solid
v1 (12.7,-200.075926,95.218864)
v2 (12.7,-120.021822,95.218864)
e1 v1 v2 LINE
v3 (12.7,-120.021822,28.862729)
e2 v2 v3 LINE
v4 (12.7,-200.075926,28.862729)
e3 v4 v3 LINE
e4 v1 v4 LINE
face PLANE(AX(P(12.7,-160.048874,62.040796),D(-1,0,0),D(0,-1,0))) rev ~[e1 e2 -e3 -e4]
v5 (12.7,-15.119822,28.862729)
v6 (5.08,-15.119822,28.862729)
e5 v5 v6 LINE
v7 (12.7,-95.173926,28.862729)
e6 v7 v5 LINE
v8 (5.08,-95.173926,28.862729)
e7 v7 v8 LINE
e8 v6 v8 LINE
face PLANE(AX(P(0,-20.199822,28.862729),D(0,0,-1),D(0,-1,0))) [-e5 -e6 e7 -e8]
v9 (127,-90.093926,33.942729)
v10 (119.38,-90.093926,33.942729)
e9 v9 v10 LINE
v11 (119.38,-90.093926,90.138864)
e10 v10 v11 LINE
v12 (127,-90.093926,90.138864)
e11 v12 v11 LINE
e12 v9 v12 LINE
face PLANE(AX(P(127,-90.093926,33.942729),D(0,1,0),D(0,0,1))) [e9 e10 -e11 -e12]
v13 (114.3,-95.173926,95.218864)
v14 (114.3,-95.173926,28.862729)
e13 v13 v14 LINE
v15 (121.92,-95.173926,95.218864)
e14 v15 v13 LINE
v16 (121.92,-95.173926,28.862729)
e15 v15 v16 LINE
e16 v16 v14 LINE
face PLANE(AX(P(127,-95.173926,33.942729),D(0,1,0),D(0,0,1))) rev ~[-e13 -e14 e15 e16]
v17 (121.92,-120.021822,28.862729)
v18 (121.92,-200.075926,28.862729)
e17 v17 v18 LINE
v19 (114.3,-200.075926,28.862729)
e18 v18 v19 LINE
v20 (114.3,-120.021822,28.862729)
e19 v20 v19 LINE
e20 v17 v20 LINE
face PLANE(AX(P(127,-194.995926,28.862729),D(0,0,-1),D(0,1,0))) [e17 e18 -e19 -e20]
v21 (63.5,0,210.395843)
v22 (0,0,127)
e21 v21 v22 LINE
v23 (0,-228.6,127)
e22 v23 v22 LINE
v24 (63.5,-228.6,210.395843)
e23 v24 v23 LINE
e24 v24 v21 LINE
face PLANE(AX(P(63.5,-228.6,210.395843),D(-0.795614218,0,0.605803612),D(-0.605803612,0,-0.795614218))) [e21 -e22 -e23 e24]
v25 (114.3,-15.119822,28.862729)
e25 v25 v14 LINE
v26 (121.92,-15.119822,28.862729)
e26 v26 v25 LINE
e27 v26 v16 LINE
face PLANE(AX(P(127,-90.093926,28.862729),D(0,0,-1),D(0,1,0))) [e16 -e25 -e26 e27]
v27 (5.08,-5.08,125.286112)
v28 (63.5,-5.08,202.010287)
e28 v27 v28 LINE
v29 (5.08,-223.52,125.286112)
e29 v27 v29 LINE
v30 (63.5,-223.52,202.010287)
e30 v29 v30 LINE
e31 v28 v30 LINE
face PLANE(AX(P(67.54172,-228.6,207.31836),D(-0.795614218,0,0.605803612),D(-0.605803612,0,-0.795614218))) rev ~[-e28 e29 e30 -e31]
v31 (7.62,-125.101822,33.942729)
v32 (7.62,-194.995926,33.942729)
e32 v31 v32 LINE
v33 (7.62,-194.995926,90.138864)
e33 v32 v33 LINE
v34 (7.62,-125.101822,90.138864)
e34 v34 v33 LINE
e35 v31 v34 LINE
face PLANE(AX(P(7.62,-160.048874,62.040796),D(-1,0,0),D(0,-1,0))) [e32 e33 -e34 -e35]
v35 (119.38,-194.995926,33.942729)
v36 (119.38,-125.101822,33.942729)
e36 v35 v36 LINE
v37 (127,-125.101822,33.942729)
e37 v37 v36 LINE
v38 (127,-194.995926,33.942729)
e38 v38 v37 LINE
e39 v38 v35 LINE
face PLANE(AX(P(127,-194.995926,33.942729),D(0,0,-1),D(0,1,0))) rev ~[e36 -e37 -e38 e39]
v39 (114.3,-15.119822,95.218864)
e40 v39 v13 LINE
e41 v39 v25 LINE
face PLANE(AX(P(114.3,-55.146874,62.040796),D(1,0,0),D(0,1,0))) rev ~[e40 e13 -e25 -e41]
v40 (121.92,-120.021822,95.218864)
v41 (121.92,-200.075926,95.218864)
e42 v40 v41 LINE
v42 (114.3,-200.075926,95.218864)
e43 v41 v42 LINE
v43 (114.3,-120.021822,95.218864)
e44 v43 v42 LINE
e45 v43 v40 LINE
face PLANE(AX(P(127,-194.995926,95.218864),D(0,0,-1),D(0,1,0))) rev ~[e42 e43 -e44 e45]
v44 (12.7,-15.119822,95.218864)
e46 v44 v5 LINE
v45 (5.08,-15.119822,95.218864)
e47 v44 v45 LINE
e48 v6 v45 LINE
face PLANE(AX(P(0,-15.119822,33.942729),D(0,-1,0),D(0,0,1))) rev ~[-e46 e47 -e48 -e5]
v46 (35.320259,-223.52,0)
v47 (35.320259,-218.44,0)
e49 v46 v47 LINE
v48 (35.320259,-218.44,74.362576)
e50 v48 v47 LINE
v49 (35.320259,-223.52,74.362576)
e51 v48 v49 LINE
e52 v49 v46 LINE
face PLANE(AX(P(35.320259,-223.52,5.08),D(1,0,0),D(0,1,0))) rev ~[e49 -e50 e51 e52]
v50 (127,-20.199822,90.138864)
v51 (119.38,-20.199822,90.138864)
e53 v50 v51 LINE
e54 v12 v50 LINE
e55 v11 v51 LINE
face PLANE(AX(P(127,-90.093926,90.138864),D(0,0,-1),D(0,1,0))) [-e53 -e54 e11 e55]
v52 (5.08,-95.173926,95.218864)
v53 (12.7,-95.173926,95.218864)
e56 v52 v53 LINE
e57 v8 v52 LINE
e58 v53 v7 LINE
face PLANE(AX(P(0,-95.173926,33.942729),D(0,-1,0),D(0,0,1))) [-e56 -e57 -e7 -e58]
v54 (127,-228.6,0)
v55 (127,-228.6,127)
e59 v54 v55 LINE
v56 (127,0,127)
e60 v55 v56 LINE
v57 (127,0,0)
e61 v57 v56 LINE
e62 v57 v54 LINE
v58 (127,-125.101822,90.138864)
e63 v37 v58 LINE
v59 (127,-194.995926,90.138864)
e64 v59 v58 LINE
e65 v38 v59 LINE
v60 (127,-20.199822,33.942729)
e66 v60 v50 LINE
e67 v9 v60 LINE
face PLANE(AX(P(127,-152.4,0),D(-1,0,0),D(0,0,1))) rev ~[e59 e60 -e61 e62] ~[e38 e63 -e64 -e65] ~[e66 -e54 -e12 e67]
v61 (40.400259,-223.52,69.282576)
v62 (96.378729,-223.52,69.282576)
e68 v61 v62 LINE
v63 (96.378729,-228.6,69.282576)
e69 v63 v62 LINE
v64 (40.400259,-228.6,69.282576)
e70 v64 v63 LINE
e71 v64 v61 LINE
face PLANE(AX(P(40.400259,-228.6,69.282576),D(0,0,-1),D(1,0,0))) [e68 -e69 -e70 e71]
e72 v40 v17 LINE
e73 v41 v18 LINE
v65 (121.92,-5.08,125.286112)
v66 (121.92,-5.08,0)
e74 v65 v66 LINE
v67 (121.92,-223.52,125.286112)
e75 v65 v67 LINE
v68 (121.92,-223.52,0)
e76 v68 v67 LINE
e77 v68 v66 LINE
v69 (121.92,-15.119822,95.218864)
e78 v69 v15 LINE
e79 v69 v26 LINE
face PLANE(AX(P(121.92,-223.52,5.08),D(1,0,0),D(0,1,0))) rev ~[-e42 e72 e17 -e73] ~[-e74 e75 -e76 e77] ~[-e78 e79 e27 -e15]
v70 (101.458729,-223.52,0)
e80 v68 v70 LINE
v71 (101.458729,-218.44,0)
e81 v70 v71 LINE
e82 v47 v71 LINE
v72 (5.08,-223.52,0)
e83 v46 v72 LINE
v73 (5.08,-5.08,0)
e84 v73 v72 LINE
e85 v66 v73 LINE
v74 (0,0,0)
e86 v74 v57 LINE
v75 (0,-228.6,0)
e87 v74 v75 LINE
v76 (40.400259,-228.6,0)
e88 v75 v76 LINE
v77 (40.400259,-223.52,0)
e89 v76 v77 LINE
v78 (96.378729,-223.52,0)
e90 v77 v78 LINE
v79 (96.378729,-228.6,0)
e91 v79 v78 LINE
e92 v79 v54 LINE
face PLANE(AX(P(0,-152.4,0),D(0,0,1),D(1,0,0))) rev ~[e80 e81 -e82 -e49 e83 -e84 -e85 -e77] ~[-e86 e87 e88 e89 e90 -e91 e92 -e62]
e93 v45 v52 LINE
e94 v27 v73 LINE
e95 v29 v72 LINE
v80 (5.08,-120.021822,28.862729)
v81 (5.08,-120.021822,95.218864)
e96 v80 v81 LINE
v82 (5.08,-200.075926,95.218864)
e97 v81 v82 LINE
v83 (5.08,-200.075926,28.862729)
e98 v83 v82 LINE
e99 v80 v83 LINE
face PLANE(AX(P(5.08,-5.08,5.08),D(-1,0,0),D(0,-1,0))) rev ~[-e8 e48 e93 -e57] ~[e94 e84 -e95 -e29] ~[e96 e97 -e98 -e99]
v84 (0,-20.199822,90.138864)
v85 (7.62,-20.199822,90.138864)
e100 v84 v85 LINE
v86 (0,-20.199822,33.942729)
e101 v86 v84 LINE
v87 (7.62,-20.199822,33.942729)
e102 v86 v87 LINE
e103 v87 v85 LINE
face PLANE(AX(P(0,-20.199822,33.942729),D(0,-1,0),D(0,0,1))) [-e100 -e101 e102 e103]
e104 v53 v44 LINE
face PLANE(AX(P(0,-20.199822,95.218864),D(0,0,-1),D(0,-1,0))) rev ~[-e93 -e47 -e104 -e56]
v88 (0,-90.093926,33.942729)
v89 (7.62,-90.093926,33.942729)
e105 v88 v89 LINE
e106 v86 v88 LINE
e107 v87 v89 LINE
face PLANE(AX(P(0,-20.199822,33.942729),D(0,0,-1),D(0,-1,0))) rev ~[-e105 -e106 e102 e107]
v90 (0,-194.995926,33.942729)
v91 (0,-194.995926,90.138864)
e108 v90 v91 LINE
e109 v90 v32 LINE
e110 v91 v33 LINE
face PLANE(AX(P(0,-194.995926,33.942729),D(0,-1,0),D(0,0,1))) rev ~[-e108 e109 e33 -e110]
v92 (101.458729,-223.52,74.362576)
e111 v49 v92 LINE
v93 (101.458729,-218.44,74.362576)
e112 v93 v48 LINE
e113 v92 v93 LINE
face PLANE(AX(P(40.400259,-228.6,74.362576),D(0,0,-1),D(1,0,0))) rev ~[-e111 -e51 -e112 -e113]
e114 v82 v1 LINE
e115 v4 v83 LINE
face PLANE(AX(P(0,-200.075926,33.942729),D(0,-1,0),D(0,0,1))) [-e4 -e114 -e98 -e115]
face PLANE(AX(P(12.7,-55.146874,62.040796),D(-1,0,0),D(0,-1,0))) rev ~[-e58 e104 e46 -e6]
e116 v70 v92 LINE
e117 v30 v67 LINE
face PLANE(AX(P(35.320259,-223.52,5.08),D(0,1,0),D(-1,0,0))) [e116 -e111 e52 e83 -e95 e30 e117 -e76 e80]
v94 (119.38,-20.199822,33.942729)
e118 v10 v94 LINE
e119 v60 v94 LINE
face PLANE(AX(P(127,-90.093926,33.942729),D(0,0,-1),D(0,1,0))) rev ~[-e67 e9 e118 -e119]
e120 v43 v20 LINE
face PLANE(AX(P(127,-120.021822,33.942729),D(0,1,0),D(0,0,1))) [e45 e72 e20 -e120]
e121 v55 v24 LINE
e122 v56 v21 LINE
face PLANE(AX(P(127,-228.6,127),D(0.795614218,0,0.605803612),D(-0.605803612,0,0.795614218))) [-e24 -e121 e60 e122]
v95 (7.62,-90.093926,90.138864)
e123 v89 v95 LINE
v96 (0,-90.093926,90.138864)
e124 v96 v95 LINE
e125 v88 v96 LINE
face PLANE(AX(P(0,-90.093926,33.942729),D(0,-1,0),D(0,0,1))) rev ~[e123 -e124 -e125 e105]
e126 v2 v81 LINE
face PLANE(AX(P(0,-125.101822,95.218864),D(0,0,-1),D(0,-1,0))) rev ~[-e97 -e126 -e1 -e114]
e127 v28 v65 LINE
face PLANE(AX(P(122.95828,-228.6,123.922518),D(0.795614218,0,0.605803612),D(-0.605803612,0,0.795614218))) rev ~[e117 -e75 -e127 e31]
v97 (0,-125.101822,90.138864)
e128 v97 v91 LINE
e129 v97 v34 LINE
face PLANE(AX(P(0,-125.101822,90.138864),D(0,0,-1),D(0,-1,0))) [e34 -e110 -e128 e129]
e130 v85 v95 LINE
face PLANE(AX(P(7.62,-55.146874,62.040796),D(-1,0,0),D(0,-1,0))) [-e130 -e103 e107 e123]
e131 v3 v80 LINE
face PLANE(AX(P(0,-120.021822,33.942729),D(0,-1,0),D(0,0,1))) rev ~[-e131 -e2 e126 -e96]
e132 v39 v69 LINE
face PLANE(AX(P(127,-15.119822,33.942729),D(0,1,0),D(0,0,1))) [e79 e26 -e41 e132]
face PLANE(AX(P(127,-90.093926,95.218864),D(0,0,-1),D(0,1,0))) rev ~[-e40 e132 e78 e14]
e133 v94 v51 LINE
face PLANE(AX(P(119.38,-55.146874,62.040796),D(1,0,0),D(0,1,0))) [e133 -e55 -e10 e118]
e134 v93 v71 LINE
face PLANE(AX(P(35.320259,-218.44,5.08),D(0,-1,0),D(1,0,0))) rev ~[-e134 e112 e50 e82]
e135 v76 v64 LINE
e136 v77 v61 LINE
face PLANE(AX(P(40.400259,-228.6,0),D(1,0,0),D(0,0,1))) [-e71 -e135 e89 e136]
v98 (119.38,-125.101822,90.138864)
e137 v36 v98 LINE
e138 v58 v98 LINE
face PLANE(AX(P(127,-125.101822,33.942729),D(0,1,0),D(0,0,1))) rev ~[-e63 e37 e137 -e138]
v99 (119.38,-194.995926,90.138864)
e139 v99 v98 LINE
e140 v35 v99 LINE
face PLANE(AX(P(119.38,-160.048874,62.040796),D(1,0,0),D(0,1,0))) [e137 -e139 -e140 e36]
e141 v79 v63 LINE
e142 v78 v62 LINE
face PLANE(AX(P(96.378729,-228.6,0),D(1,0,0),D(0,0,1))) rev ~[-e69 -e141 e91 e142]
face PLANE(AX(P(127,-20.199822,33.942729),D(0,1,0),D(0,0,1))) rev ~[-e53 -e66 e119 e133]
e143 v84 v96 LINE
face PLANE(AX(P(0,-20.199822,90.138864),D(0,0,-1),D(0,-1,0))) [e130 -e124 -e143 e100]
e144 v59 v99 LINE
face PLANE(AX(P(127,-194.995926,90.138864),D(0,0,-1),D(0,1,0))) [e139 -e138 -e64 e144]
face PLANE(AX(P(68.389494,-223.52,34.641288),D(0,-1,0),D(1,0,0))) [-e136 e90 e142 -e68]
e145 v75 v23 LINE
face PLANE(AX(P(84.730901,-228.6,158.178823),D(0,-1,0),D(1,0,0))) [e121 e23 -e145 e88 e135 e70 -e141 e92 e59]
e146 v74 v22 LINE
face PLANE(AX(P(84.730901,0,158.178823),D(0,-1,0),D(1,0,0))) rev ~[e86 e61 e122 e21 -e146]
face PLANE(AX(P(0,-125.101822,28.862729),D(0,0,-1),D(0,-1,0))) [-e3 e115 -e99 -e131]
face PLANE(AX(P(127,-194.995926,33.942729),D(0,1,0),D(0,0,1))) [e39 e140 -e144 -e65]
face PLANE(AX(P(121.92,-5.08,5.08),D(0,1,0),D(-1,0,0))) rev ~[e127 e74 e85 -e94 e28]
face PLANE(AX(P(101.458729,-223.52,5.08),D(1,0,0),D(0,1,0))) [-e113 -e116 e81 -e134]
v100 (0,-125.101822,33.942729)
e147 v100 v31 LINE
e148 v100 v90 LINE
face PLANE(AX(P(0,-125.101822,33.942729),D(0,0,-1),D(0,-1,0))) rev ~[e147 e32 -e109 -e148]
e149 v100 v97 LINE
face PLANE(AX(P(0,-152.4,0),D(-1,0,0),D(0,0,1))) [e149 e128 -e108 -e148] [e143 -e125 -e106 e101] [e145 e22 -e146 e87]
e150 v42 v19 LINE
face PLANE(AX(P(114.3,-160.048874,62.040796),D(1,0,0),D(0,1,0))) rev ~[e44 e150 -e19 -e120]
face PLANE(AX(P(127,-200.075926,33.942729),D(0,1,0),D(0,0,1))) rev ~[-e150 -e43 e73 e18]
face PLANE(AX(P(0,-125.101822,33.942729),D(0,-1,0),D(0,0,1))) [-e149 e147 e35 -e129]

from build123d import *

# Parameters (mm, degrees)
F0_W      = 127
F0_H      = 127
F1_DEPTH  = 127
F2_DEPTH  = 25.4
F3_DEPTH  = 76.2
F5_DEPTH  = 228.6
F6_W      = 55.9784695506
F6_H      = 69.2825764418
F7_DEPTH  = 5.08
F8_W      = 69.8941033334
F8_H      = 56.1961345005
F9_DEPTH  = 7.62
F11_W     = 69.8941033334
F11_H     = 56.1961345005
F10_W     = 69.8941033334
F10_H     = 56.1961345005
F12_DEPTH = 7.62
F13_T     = -5.08


# Not quite as in the source:
# - a shell that OpenCascade refuses in one call is made with other operations: the cavity is built on its own and cut out


with BuildPart() as f1:
    # F0 (on Top) → F1 (new body)
    with BuildSketch(Plane.XY):
        with Locations((63.5, -63.5)):
            Rectangle(F0_W, F0_H)
    extrude(amount=F1_DEPTH)

    # F2 (add): a face of the model
    f2_faces = [f1.faces().sort_by_distance(p)[0] for p in [
        (63.5, -127, 63.5),
    ]]
    extrude(f2_faces, amount=F2_DEPTH)

    # F3 (add): a face of the model
    f3_faces = [f1.faces().sort_by_distance(p)[0] for p in [
        (63.5, -152.4, 63.5),
    ]]
    extrude(f3_faces, amount=F3_DEPTH)

    # F4 (on face) → F5 (join)
    with BuildSketch(Plane.XZ.offset(228.6)):
        Polygon((63.5, 210.3958427906), (63.5, 127), (127, 127), align=None)
        Polygon((63.5, 210.3958427906), (0, 127), (63.5, 127), align=None)
    extrude(amount=-F5_DEPTH)

    # F6 (on face) → F7 (cut)
    with BuildSketch(Plane.XZ.offset(228.6)):
        with Locations((68.3894939721, 34.6412882209)):
            Rectangle(F6_W, F6_H)
    extrude(amount=-F7_DEPTH, mode=Mode.SUBTRACT)

    # F8 (on face) → F9 (cut)
    with BuildSketch(Plane(origin=(0, 0, 0), x_dir=(0, -1, 0), z_dir=(-1, 0, 0))):
        with Locations((55.1468739286, 62.0407964849)):
            Rectangle(F8_W, F8_H)
        with Locations((160.0488739286, 62.0407964849)):
            Rectangle(F8_W, F8_H)
    extrude(amount=-F9_DEPTH, mode=Mode.SUBTRACT)

    # F11 (on face) + F10 (on face) → F12 (cut)
    with BuildSketch(Plane.YZ.offset(127)):
        with Locations((-160.0488739286, 62.0407964849)):
            Rectangle(F11_W, F11_H)
    with BuildSketch(Plane.YZ.offset(127)):
        with Locations((-55.1468739286, 62.0407964849)):
            Rectangle(F10_W, F10_H)
    extrude(amount=-F12_DEPTH, mode=Mode.SUBTRACT)

    # F13: a shell. OpenCascade refuses it in one call, so the cavity is built on its own and cut out:
    # the body offset inwards by the wall thickness, plus a prism from it out through each open face.
    f13_core = offset(f1.part, amount=F13_T, kind=Kind.INTERSECTION, mode=Mode.PRIVATE)
    f13_exits = [f13_core.faces().sort_by_distance(p)[0] for p in [
        (63.434775, -112.87691, 5.08),
    ]]
    add(f13_core, mode=Mode.SUBTRACT)
    extrude(f13_exits, amount=-F13_T, mode=Mode.SUBTRACT)


solid = f1.part
